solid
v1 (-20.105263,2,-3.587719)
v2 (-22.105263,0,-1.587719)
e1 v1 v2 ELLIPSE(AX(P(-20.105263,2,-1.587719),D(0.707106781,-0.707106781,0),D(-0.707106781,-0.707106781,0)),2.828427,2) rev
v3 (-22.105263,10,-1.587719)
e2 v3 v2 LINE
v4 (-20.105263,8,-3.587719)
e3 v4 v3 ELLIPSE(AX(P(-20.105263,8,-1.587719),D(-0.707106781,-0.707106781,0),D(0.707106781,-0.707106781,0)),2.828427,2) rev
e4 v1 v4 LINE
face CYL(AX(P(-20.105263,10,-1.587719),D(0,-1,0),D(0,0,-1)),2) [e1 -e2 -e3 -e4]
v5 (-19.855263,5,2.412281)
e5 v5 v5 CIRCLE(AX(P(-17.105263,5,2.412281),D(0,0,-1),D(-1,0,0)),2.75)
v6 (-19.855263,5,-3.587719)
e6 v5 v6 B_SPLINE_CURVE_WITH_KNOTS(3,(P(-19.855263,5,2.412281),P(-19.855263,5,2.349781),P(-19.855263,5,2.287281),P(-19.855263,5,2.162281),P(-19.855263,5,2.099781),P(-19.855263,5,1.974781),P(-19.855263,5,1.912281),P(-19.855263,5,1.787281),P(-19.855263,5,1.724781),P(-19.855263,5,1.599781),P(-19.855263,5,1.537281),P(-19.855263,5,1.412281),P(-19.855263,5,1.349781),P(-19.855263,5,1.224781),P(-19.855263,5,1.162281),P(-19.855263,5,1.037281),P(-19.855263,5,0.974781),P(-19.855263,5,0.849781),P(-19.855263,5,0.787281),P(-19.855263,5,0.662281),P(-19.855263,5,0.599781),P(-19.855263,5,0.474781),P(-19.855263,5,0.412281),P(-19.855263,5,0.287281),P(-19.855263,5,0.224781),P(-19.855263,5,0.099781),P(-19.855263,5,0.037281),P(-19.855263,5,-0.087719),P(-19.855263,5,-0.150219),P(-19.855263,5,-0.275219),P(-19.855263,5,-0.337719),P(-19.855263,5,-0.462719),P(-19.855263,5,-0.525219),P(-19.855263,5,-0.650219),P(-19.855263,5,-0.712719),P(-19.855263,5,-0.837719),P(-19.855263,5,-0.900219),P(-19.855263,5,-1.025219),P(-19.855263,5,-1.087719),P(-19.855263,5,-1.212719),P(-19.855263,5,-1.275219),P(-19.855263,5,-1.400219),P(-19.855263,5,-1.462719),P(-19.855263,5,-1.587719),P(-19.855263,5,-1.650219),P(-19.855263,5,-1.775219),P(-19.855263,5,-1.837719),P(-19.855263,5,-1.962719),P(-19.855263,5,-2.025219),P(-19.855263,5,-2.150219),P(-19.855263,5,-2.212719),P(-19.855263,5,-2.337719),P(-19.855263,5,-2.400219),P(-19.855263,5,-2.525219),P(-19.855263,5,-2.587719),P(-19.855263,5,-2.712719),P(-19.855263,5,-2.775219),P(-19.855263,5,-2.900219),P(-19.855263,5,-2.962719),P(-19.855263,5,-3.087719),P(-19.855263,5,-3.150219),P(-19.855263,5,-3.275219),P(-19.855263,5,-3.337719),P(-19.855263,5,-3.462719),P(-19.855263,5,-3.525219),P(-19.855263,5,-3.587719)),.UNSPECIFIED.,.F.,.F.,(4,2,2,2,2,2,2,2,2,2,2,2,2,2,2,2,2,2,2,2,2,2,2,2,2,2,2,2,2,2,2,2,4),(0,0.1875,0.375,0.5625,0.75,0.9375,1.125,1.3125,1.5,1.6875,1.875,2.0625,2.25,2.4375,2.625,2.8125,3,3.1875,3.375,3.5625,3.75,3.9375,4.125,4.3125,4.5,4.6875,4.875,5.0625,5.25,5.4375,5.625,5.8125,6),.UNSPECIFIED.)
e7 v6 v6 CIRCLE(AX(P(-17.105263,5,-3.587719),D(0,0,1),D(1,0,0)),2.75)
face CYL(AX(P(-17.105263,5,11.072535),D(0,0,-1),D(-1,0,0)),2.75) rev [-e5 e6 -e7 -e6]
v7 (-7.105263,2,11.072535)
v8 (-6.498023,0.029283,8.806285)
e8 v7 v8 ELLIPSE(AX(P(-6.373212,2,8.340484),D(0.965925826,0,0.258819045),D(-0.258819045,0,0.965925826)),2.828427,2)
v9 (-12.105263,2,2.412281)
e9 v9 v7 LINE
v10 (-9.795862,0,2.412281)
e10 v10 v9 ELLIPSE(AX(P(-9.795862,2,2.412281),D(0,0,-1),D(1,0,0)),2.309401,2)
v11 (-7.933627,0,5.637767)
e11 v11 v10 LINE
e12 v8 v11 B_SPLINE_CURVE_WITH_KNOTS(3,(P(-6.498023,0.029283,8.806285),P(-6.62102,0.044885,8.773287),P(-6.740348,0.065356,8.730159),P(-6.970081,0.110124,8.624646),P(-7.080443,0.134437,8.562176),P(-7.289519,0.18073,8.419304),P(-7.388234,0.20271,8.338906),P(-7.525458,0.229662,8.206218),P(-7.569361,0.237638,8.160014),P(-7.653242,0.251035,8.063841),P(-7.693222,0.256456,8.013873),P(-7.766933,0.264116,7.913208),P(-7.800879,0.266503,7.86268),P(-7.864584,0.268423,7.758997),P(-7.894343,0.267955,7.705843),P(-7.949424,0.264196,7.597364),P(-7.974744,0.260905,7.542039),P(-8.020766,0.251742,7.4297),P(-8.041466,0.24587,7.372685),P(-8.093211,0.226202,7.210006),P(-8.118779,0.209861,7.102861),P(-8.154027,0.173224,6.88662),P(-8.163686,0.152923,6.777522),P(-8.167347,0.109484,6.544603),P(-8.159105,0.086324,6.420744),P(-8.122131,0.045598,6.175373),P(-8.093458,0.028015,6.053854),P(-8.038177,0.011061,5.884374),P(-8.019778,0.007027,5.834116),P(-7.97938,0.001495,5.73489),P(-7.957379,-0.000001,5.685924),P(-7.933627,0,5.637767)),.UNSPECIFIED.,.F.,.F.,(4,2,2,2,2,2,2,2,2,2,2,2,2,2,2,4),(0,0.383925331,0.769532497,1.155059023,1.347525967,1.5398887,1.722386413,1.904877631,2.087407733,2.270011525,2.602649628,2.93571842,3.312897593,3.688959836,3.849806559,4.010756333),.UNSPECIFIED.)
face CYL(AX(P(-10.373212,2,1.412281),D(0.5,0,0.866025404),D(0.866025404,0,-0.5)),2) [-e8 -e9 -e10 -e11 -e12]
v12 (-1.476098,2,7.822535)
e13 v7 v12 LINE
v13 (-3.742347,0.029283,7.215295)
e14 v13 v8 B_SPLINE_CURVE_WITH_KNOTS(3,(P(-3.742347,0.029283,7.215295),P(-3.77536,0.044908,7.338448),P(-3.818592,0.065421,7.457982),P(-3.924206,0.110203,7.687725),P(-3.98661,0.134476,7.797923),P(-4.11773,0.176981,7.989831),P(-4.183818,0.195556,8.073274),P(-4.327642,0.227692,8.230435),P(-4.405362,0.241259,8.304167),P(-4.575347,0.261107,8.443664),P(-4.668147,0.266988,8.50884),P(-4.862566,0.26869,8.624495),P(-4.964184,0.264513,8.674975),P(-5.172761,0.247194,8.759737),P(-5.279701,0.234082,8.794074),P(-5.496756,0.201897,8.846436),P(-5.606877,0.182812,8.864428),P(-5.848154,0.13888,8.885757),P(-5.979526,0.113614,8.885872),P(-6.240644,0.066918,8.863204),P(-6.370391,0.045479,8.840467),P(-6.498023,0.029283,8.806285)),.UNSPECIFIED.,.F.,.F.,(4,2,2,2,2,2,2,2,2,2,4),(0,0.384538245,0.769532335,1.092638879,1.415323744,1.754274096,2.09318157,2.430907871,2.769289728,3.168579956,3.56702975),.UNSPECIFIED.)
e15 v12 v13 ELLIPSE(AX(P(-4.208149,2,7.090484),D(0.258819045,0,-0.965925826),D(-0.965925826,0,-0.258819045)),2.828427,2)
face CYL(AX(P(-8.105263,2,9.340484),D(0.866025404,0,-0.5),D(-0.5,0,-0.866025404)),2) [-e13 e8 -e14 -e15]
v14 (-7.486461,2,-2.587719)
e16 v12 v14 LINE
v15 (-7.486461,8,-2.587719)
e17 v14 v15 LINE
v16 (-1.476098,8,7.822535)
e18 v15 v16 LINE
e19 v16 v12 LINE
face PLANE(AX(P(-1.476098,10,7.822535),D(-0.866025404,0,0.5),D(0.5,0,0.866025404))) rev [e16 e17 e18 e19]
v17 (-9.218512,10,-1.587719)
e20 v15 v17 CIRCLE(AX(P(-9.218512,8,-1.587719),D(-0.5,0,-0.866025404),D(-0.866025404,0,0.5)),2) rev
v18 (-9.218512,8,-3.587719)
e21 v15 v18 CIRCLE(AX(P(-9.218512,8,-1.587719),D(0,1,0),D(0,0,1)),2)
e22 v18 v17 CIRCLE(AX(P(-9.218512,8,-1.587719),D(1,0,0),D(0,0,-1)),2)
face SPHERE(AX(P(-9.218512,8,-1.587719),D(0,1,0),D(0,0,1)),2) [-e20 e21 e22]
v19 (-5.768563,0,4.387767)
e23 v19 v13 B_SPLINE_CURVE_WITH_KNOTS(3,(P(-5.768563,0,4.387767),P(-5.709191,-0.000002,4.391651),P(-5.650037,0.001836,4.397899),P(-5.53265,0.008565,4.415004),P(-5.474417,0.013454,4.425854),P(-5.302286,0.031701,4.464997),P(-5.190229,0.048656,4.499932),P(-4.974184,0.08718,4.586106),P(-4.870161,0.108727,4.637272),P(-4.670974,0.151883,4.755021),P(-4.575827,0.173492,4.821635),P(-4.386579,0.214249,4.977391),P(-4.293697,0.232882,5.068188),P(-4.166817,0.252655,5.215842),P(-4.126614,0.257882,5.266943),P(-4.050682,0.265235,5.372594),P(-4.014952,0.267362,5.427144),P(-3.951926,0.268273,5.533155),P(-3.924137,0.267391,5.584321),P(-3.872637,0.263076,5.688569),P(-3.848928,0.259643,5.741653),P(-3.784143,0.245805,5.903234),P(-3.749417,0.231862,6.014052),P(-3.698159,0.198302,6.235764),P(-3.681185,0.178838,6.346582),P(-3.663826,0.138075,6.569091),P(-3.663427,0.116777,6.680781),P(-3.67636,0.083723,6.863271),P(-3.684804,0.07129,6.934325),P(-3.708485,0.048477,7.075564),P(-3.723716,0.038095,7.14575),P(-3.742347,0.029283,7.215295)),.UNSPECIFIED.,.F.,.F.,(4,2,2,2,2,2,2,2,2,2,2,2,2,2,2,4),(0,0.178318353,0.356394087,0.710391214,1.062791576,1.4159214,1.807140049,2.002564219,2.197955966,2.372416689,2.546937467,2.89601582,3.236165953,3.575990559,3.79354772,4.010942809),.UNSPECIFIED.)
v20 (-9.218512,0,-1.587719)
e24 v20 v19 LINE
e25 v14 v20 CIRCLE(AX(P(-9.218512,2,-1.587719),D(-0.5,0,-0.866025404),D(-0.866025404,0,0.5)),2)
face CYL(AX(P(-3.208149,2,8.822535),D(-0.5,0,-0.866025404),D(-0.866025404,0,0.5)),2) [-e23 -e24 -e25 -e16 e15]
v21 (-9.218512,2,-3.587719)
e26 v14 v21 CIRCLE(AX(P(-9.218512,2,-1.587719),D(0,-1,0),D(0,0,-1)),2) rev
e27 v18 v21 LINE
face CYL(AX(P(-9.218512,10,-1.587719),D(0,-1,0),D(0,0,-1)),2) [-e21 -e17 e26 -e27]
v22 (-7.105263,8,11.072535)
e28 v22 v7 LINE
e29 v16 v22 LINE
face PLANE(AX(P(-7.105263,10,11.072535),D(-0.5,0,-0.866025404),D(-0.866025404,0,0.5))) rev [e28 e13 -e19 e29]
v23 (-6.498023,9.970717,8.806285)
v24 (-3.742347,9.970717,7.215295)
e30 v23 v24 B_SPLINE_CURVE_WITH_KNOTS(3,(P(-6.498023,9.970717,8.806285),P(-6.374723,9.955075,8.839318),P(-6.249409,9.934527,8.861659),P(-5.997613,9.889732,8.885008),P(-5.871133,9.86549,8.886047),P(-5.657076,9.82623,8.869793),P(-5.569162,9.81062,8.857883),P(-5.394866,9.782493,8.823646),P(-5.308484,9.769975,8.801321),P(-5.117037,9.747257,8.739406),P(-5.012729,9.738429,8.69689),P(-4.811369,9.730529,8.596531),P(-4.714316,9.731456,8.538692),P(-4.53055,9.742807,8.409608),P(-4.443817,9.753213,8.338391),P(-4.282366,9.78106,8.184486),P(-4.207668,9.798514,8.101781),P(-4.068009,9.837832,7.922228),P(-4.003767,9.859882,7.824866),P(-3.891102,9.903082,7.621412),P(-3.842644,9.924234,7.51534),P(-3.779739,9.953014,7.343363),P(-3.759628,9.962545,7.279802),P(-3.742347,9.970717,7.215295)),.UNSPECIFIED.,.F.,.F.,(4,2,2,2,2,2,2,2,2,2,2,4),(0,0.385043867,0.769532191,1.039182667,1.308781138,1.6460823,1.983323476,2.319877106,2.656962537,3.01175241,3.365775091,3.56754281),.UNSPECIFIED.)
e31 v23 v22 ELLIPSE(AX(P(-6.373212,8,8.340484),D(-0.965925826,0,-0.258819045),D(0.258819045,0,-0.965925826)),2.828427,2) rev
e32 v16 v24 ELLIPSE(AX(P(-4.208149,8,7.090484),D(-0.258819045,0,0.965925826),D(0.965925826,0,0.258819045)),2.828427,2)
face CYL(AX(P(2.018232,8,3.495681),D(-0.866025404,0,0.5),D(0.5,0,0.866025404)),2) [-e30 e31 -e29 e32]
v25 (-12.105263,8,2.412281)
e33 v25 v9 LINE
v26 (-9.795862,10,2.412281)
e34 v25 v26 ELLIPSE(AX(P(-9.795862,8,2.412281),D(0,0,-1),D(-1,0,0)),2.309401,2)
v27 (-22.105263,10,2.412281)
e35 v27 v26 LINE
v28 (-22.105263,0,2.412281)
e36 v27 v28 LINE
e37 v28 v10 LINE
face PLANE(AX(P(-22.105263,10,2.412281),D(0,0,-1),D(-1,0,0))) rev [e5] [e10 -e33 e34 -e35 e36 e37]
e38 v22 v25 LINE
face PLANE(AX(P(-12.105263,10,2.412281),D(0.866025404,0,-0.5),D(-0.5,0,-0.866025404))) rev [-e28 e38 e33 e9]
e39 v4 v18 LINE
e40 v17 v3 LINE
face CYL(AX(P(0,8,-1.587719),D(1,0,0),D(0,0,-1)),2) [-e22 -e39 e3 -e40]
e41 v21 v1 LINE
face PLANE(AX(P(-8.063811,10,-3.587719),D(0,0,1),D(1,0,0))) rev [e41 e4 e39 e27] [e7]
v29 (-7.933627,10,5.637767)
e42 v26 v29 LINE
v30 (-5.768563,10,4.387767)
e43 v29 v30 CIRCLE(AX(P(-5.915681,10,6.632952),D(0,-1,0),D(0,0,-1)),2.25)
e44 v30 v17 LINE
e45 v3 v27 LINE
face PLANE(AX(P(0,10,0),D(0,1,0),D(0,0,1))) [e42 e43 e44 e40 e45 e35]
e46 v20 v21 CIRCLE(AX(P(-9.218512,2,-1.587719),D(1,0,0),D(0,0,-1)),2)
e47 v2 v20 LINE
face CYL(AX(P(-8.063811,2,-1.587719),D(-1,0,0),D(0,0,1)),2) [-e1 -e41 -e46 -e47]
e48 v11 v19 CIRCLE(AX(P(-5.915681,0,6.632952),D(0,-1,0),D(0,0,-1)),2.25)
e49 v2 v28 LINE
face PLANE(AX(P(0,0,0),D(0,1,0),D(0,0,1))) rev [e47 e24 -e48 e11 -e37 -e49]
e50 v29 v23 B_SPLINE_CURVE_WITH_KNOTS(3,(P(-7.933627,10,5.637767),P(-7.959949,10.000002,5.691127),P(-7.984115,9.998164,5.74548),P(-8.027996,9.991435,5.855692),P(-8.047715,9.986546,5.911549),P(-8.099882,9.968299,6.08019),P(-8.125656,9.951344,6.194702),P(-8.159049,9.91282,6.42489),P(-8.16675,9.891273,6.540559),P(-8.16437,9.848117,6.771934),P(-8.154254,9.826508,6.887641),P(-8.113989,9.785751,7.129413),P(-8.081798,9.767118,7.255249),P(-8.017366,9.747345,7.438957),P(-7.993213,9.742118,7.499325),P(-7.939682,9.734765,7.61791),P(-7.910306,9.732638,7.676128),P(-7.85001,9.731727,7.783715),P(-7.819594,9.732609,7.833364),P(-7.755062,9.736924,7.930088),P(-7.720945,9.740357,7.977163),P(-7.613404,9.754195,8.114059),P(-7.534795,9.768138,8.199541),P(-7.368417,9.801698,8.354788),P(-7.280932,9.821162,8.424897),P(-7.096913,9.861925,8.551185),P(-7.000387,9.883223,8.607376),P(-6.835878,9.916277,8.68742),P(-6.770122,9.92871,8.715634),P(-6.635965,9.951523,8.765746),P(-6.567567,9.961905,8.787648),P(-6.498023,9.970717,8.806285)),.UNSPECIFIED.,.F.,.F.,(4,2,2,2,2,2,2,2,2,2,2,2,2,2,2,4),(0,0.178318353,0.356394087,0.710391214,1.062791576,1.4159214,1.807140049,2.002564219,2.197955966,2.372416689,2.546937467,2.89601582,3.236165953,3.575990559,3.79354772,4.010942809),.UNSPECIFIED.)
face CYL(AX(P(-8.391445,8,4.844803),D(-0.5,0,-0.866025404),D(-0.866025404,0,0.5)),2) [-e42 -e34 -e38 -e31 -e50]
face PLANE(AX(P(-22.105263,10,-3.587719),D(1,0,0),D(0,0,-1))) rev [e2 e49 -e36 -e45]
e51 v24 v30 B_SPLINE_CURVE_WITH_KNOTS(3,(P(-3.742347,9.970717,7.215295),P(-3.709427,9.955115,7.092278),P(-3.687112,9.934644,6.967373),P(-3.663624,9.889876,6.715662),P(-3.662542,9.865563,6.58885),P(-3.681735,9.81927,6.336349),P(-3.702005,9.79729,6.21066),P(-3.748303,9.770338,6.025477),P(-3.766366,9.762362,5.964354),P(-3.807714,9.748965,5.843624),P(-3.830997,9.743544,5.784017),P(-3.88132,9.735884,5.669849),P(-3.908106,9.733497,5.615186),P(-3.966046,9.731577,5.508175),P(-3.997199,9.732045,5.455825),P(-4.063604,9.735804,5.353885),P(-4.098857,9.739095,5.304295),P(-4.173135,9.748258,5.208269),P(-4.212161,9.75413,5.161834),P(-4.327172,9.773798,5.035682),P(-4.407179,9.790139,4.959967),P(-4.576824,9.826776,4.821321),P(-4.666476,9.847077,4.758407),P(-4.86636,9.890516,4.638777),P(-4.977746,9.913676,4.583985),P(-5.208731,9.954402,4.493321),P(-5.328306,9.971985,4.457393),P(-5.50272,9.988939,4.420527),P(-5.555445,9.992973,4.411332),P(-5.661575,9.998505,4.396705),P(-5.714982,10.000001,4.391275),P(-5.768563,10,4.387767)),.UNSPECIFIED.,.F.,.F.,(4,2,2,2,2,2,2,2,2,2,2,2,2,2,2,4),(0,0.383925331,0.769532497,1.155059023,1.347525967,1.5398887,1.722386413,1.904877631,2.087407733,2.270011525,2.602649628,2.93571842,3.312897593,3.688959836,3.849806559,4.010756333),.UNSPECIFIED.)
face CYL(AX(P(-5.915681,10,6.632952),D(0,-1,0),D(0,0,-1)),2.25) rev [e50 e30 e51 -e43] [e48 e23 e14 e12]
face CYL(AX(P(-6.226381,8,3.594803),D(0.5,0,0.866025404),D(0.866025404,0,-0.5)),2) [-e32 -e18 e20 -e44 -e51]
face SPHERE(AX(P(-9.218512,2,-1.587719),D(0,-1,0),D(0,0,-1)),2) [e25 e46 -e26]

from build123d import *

# Parameters (mm, degrees)
EXTRUDE_1_DEPTH          = 10
CUT_EXTRUDE_1_DEPTH      = 29.347234569
CUT_EXTRUDE_1_DEPTH_BACK = 29.347234569
SKETCH_2_R               = 2.75
SKETCH_3_R               = 2.25
CUT_EXTRUDE_2_DEPTH      = 27.669152308
FILLET_1_R               = 2


with BuildPart() as part:
    # Эскиз1 → Бобышка-Вытянуть1 (new body)
    with BuildSketch(Plane(origin=(0, 0, 0), x_dir=(1, 0, 0), z_dir=(0, 1, 0))):
        Polygon((-22.105263158, 3.587719298), (-22.105263158, -2.412280702), (-12.105263158, -2.412280702), (-7.105263158, -11.07253474), (-1.476098033, -7.82253474), (-8.063811274, 3.587719298), align=None)
    extrude(amount=EXTRUDE_1_DEPTH)

    # Эскиз2 → Вырез-Вытянуть1 (cut, two sides: drawn at the far end of the back side and taken through both)
    with BuildSketch(Plane(origin=(0, 0, -3.587719298), x_dir=(-1, 0, 0), z_dir=(0, 0, -1)).offset(-CUT_EXTRUDE_1_DEPTH_BACK)):
        with Locations((17.105263158, 5)):
            Circle(SKETCH_2_R)
    extrude(amount=CUT_EXTRUDE_1_DEPTH + CUT_EXTRUDE_1_DEPTH_BACK, mode=Mode.SUBTRACT)

    # Эскиз3 → Вырез-Вытянуть2 (cut, through all)
    with BuildSketch(Plane.XZ):
        with Locations(Location((-5.915680596, 6.632952177, 0), (0, 0, 270))):
            Circle(SKETCH_3_R)
    extrude(amount=-CUT_EXTRUDE_2_DEPTH, mode=Mode.SUBTRACT)

    # Скругление1
    # the kernel refuses this fillet: 2 mm, written as the material it takes off along each edge
    with BuildSketch(Plane(origin=(-9.218511812, 2, -1.587719298), x_dir=(0.8660254037844398, 0, -0.499999999999998), z_dir=(0, -1, 0))) as fillet_1_piece_1_section:
        Polygon((0, 0), (FILLET_1_R, 0), (FILLET_1_R, -FILLET_1_R * 0.57735026919), (FILLET_1_R * 0.5, -FILLET_1_R * 0.866025403784), align=None)
    fillet_1_piece_1 = extrude(amount=FILLET_1_R, mode=Mode.PRIVATE)
    fillet_1_piece_1 = fillet_1_piece_1 - Plane(origin=(-9.218511812, 2, -1.587719298), x_dir=(-0.500000000000001, 0, 0.8660254037844382), z_dir=(0, -1, 0)) * Sphere(FILLET_1_R, mode=Mode.PRIVATE)
    add(fillet_1_piece_1, mode=Mode.SUBTRACT)
    with BuildSketch(Plane(origin=(-9.218511812, 8, -1.587719298), x_dir=(0.8660254037844398, 0, -0.499999999999998), z_dir=(0, 1, 0))) as fillet_1_piece_2_section:
        Polygon((0, 0), (FILLET_1_R, 0), (FILLET_1_R, FILLET_1_R * 0.57735026919), (FILLET_1_R * 0.5, FILLET_1_R * 0.866025403784), align=None)
    fillet_1_piece_2 = extrude(amount=FILLET_1_R, mode=Mode.PRIVATE)
    fillet_1_piece_2 = fillet_1_piece_2 - Plane(origin=(-9.218511812, 8, -1.587719298), x_dir=(-0.500000000000001, 0, 0.8660254037844382), z_dir=(0, 1, 0)) * Sphere(FILLET_1_R, mode=Mode.PRIVATE)
    add(fillet_1_piece_2, mode=Mode.SUBTRACT)
    with BuildSketch(Plane(origin=(-8.063811274, 2, -3.587719298), x_dir=(-1, 0, 0), z_dir=(0, 1, 0))) as fillet_1_piece_3:
        with BuildLine():
            CenterArc((FILLET_1_R * 0.57735026919, FILLET_1_R), FILLET_1_R, 210, 60)
            Line((-FILLET_1_R * 0.288675134595, FILLET_1_R * 0.5), (0, 0))
            Line((0, 0), (FILLET_1_R * 0.57735026919, 0))
        make_face()
    extrude(amount=6, mode=Mode.SUBTRACT)
    with BuildSketch(Plane(origin=(-22.105263158, -5, -3.587719298), x_dir=(0, 0, 1), z_dir=(0, 1, 0))) as fillet_1_piece_4:
        with BuildLine():
            CenterArc((FILLET_1_R, FILLET_1_R), FILLET_1_R, 180, 90)
            Line((0, FILLET_1_R), (0, 0))
            Line((0, 0), (FILLET_1_R, 0))
        make_face()
    extrude(amount=20, mode=Mode.SUBTRACT)
    with BuildSketch(Plane(origin=(-14.605263158, 10, -1.917846317), x_dir=(0.8660254037844399, 0, -0.4999999999999979), z_dir=(0.49999999999999795, 0, 0.8660254037844399))) as fillet_1_piece_5_section:
        with BuildLine():
            CenterArc((FILLET_1_R, -FILLET_1_R), FILLET_1_R, 90, 90)
            Line((0, -FILLET_1_R), (0, 0))
            Line((0, 0), (FILLET_1_R, 0))
        make_face()
    fillet_1_piece_5 = extrude(amount=20, mode=Mode.PRIVATE)
    fillet_1_piece_5 = split(fillet_1_piece_5, bisect_by=Plane(origin=(-7.90513861, 9.542907556, 2.412280702), z_dir=(0, 0, 1)), keep=Keep.TOP, mode=Mode.PRIVATE)
    add(fillet_1_piece_5, mode=Mode.SUBTRACT)
    with BuildSketch(Plane(origin=(-11.435390177, 10, 13.57253474), x_dir=(-0.4999999999999979, 0, -0.8660254037844399), z_dir=(0.8660254037844399, 0, -0.49999999999999795))) as fillet_1_piece_6:
        with BuildLine():
            CenterArc((FILLET_1_R, -FILLET_1_R), FILLET_1_R, 90, 90)
            Line((0, -FILLET_1_R), (0, 0))
            Line((0, 0), (FILLET_1_R, 0))
        make_face()
    extrude(amount=16.5, mode=Mode.SUBTRACT)
    with BuildSketch(Plane(origin=(1.023901967, 10, 12.152661759), x_dir=(-0.8660254037844398, 0, 0.499999999999998), z_dir=(-0.499999999999998, 0, -0.8660254037844398))) as fillet_1_piece_7:
        with BuildLine():
            CenterArc((FILLET_1_R, -FILLET_1_R), FILLET_1_R, 90, 90)
            Line((0, -FILLET_1_R), (0, 0))
            Line((0, 0), (FILLET_1_R, 0))
        make_face()
    extrude(amount=17.020725942, mode=Mode.SUBTRACT)
    with BuildSketch(Plane(origin=(-9.218511812, 10, -3.587719298), x_dir=(0, -1, 0), z_dir=(-1, 0, 0))) as fillet_1_piece_8:
        with BuildLine():
            CenterArc((FILLET_1_R, FILLET_1_R), FILLET_1_R, 180, 90)
            Line((0, FILLET_1_R), (0, 0))
            Line((0, 0), (FILLET_1_R, 0))
        make_face()
    extrude(amount=17.886751346, mode=Mode.SUBTRACT)
    with BuildSketch(Plane(origin=(1.023901967, 0, 12.152661759), x_dir=(-0.8660254037844398, 0, 0.499999999999998), z_dir=(-0.499999999999998, 0, -0.8660254037844398))) as fillet_1_piece_9:
        with BuildLine():
            CenterArc((FILLET_1_R, FILLET_1_R), FILLET_1_R, 180, 90)
            Line((0, FILLET_1_R), (0, 0))
            Line((0, 0), (FILLET_1_R, 0))
        make_face()
    extrude(amount=17.020725942, mode=Mode.SUBTRACT)
    with BuildSketch(Plane(origin=(-11.435390177, 0, 13.57253474), x_dir=(-0.4999999999999979, 0, -0.8660254037844399), z_dir=(0.8660254037844399, 0, -0.49999999999999795))) as fillet_1_piece_10:
        with BuildLine():
            CenterArc((FILLET_1_R, FILLET_1_R), FILLET_1_R, 180, 90)
            Line((0, FILLET_1_R), (0, 0))
            Line((0, 0), (FILLET_1_R, 0))
        make_face()
    extrude(amount=16.5, mode=Mode.SUBTRACT)
    with BuildSketch(Plane(origin=(-14.605263158, 0, -1.917846317), x_dir=(0.8660254037844398, 0, -0.4999999999999979), z_dir=(0.49999999999999795, 0, 0.8660254037844399))) as fillet_1_piece_11_section:
        with BuildLine():
            CenterArc((FILLET_1_R, FILLET_1_R), FILLET_1_R, 180, 90)
            Line((0, FILLET_1_R), (0, 0))
            Line((0, 0), (FILLET_1_R, 0))
        make_face()
    fillet_1_piece_11 = extrude(amount=20, mode=Mode.PRIVATE)
    fillet_1_piece_11 = split(fillet_1_piece_11, bisect_by=Plane(origin=(-7.90513861, 0.457092444, 2.412280702), z_dir=(0, 0, 1)), keep=Keep.TOP, mode=Mode.PRIVATE)
    add(fillet_1_piece_11, mode=Mode.SUBTRACT)
    with BuildSketch(Plane(origin=(-9.218511812, 0, -3.587719298), x_dir=(0, 1, 0), z_dir=(-1, 0, 0))) as fillet_1_piece_12:
        with BuildLine():
            CenterArc((FILLET_1_R, -FILLET_1_R), FILLET_1_R, 90, 90)
            Line((0, -FILLET_1_R), (0, 0))
            Line((0, 0), (FILLET_1_R, 0))
        make_face()
    extrude(amount=17.886751346, mode=Mode.SUBTRACT)


solid = part.part
